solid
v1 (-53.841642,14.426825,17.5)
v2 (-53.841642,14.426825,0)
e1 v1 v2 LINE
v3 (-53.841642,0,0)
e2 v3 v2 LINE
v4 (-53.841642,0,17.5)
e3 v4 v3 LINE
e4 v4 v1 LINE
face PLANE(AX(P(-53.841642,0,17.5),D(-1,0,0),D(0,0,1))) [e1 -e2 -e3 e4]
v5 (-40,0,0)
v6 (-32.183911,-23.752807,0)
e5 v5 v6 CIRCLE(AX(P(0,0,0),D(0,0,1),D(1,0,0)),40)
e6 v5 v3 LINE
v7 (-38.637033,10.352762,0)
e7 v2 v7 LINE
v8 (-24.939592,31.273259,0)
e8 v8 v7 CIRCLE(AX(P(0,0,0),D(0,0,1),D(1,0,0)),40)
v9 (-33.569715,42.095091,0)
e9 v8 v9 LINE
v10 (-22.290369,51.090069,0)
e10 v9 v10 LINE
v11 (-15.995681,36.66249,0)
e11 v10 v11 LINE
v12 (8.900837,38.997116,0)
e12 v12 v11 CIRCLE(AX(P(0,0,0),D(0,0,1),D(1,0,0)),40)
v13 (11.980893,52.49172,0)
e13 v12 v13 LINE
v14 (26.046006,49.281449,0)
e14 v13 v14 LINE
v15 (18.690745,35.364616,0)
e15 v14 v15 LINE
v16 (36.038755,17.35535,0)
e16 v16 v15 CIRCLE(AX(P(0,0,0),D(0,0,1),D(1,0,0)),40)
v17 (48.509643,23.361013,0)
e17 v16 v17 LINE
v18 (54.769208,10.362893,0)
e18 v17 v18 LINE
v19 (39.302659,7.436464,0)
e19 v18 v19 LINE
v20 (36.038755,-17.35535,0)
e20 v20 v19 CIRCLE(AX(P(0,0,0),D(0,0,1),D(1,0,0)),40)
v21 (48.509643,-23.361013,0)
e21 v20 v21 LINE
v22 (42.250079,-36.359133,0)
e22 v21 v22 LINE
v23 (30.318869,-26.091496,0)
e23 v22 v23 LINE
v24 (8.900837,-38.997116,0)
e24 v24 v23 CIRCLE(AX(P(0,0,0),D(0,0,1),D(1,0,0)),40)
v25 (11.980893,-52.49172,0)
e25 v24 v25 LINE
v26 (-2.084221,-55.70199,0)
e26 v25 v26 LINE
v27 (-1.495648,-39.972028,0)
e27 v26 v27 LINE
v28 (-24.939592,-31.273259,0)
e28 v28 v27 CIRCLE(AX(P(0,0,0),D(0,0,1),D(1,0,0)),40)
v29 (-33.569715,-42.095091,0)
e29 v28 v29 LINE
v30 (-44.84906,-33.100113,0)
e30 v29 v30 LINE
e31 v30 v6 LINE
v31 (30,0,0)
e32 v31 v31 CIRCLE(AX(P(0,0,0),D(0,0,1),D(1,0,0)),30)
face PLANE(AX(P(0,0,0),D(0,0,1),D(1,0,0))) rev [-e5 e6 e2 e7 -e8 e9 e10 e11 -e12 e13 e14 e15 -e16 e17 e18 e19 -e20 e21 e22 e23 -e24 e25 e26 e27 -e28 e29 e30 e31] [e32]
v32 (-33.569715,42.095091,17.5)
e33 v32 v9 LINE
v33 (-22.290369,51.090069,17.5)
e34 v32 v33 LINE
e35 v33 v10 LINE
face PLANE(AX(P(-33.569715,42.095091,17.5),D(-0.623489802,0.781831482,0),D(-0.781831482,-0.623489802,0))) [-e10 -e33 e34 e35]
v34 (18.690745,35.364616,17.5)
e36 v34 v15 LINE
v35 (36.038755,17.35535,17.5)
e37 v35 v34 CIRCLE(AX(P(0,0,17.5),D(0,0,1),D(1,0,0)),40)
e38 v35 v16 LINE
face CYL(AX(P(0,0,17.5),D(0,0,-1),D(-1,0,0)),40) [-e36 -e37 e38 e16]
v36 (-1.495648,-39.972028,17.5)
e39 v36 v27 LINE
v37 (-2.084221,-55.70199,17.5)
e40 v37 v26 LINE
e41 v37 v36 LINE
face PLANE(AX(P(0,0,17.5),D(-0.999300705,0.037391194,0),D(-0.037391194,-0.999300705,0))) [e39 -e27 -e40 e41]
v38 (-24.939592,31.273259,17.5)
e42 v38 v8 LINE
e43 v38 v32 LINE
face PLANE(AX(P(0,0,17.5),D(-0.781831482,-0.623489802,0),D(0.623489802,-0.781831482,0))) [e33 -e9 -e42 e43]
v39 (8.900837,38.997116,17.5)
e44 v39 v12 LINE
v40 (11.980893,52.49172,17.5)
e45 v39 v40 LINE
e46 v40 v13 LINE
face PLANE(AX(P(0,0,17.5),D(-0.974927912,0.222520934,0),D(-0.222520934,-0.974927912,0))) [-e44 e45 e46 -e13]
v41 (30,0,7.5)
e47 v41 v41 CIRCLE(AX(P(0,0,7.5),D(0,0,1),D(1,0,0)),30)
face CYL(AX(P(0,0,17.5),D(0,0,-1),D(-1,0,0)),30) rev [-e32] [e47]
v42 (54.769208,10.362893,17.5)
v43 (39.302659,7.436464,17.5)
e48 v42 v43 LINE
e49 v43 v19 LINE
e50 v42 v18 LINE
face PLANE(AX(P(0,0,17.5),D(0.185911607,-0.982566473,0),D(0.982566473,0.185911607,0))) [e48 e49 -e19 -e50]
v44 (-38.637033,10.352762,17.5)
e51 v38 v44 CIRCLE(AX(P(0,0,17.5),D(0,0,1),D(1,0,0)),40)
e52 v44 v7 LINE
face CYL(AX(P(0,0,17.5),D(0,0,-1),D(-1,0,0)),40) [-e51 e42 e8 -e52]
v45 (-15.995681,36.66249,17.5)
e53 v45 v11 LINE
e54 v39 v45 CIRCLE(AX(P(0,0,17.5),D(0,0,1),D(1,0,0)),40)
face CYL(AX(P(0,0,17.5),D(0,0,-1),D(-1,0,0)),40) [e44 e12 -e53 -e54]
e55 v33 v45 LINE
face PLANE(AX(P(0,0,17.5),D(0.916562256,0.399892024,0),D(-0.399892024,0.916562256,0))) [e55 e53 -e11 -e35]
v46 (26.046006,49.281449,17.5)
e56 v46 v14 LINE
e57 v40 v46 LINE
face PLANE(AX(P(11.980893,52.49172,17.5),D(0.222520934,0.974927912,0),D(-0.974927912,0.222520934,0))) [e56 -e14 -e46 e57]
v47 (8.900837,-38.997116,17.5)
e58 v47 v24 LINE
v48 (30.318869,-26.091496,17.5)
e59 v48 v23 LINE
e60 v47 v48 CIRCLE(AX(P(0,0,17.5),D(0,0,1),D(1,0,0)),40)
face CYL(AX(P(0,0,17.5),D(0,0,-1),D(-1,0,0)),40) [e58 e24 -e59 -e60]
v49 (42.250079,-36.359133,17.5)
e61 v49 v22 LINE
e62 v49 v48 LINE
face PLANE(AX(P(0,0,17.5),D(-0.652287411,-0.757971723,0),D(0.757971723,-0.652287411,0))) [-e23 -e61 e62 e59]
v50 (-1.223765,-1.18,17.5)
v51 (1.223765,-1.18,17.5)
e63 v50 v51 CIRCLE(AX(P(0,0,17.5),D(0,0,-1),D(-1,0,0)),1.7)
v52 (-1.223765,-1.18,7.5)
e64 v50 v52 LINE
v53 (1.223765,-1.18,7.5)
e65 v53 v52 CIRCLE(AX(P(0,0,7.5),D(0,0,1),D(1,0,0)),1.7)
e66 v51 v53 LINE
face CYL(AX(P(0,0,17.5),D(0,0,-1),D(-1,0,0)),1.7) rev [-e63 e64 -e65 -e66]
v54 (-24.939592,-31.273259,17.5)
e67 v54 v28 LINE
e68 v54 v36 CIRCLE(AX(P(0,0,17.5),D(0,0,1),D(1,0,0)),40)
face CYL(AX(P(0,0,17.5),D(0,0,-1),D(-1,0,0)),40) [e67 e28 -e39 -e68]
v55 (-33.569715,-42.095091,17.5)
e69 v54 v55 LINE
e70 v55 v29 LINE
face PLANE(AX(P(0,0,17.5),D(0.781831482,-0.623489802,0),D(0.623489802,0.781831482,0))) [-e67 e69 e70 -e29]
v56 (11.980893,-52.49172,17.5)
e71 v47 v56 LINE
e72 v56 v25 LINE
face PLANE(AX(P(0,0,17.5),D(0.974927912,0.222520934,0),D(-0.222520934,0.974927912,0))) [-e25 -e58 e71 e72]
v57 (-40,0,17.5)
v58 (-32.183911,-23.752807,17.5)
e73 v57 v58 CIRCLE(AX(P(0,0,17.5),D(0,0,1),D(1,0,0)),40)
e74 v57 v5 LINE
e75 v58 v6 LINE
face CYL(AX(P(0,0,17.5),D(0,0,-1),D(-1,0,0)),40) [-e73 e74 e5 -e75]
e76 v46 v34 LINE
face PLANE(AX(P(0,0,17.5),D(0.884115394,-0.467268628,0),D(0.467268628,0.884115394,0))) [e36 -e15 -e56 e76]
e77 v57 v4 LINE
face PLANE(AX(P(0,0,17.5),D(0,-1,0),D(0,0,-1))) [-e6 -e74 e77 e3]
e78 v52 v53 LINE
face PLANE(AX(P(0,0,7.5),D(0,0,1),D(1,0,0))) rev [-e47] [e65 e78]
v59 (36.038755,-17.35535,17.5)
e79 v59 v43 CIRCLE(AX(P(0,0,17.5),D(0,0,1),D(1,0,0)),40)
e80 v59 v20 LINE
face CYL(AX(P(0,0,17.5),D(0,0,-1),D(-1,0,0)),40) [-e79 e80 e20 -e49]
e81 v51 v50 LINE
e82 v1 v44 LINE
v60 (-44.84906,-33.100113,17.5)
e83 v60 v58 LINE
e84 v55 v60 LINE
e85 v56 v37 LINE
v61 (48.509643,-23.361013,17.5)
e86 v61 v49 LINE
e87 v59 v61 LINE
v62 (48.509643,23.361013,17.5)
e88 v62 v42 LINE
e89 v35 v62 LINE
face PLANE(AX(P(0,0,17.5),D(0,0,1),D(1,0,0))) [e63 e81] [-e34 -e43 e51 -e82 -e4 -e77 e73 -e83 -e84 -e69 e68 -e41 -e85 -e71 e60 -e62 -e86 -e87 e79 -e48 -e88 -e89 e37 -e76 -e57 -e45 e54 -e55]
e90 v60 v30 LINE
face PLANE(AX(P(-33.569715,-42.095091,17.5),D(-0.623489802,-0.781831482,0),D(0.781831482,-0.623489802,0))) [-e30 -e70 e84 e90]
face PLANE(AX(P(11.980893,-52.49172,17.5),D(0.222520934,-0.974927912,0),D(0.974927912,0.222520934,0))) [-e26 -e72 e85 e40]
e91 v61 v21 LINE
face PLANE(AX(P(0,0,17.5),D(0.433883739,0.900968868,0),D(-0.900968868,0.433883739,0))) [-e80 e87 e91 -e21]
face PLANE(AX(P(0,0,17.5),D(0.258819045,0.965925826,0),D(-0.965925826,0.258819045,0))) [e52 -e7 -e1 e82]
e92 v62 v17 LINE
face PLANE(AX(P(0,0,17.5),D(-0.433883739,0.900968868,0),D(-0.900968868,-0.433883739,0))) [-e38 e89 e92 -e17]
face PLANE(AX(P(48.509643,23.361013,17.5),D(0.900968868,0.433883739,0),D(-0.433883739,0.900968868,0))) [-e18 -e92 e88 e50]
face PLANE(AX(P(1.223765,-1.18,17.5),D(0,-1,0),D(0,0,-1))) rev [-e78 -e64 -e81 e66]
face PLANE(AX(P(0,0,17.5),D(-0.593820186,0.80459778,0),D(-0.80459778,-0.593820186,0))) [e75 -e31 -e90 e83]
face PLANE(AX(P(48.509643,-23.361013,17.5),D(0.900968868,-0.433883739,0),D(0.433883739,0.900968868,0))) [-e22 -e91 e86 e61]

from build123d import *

# Parameters (mm, degrees)
SKETCH1_R           = 40
BOSS_EXTRUDE1_DEPTH = 17.5
SHELL1_OUTLINE_R    = 30
SHELL1_DEPTH        = 7.5
CUT_EXTRUDE1_DEPTH  = 17.5


# Read off the part's stored shape, not the designer's step: Shell1
with BuildPart() as part:
    # Sketch1 → Boss-Extrude1 (new body)
    with BuildSketch(Plane.XY):
        Circle(SKETCH1_R)
        with BuildLine():
            Line((-53.841642229, 0), (-40, 0))
            ThreePointArc((-40, 0), (-39.657794455, 5.221047689), (-38.637033052, 10.352761804))
            Line((-38.637033052, 10.352761804), (-53.841642229, 14.426824554))
            Line((-53.841642229, 14.426824554), (-53.841642229, 0))
        make_face()
        with BuildLine():
            Line((-33.569714845, 42.095090962), (-24.939592074, 31.273259299))
            ThreePointArc((-24.939592074, 31.273259299), (-20.644250952, 34.260982219), (-15.995680973, 36.662490235))
            Line((-15.995680973, 36.662490235), (-22.290369216, 51.090068945))
            Line((-22.290369216, 51.090068945), (-33.569714845, 42.095090962))
        make_face()
        with BuildLine():
            Line((11.980892514, 52.491719847), (8.900837358, 38.997116487))
            ThreePointArc((8.900837358, 38.997116487), (13.914834583, 37.501698342), (18.690745131, 35.36461574))
            Line((18.690745131, 35.36461574), (26.046006457, 49.281449373))
            Line((26.046006457, 49.281449373), (11.980892514, 52.491719847))
        make_face()
        with BuildLine():
            Line((48.509643445, 23.36101305), (36.038754716, 17.355349565))
            ThreePointArc((36.038754716, 17.355349565), (37.995765867, 12.502870718), (39.302658929, 7.436464287))
            Line((39.302658929, 7.436464287), (54.769208026, 10.362893264))
            Line((54.769208026, 10.362893264), (48.509643445, 23.36101305))
        make_face()
        with BuildLine():
            ThreePointArc((36.038754716, -17.355349565), (33.46511048, -21.910873569), (30.318868926, -26.091496451))
            Line((30.318868926, -26.091496451), (42.250078864, -36.359132837))
            Line((42.250078864, -36.359132837), (48.509643445, -23.36101305))
            Line((48.509643445, -23.36101305), (36.038754716, -17.355349565))
        make_face()
        with BuildLine():
            ThreePointArc((8.900837358, -38.997116487), (3.734544338, -39.825283158), (-1.495647771, -39.972028192))
            Line((-1.495647771, -39.972028192), (-2.084221428, -55.70199032))
            Line((-2.084221428, -55.70199032), (11.980892514, -52.491719847))
            Line((11.980892514, -52.491719847), (8.900837358, -38.997116487))
        make_face()
        with BuildLine():
            ThreePointArc((-24.939592074, -31.273259299), (-28.808209861, -27.750442241), (-32.183911191, -23.752807423))
            Line((-32.183911191, -23.752807423), (-44.849060474, -33.100112979))
            Line((-44.849060474, -33.100112979), (-33.569714845, -42.095090962))
            Line((-33.569714845, -42.095090962), (-24.939592074, -31.273259299))
        make_face()
    extrude(amount=BOSS_EXTRUDE1_DEPTH)

    # Shell1 outline → Shell1 (cut)
    with BuildSketch(Plane.XY):
        Circle(SHELL1_OUTLINE_R)
    extrude(amount=SHELL1_DEPTH, mode=Mode.SUBTRACT)

    # Sketch2 → Cut-Extrude1 (cut)
    with BuildSketch(Plane(origin=(0, 0, 0), x_dir=(-1, 0, 0), z_dir=(0, 0, -1))):
        with BuildLine():
            Line((-1.223764683, -1.18), (1.223764683, -1.18))
            ThreePointArc((1.223764683, -1.18), (0, 1.7), (-1.223764683, -1.18))
        make_face()
    extrude(amount=-CUT_EXTRUDE1_DEPTH, mode=Mode.SUBTRACT)


solid = part.part
